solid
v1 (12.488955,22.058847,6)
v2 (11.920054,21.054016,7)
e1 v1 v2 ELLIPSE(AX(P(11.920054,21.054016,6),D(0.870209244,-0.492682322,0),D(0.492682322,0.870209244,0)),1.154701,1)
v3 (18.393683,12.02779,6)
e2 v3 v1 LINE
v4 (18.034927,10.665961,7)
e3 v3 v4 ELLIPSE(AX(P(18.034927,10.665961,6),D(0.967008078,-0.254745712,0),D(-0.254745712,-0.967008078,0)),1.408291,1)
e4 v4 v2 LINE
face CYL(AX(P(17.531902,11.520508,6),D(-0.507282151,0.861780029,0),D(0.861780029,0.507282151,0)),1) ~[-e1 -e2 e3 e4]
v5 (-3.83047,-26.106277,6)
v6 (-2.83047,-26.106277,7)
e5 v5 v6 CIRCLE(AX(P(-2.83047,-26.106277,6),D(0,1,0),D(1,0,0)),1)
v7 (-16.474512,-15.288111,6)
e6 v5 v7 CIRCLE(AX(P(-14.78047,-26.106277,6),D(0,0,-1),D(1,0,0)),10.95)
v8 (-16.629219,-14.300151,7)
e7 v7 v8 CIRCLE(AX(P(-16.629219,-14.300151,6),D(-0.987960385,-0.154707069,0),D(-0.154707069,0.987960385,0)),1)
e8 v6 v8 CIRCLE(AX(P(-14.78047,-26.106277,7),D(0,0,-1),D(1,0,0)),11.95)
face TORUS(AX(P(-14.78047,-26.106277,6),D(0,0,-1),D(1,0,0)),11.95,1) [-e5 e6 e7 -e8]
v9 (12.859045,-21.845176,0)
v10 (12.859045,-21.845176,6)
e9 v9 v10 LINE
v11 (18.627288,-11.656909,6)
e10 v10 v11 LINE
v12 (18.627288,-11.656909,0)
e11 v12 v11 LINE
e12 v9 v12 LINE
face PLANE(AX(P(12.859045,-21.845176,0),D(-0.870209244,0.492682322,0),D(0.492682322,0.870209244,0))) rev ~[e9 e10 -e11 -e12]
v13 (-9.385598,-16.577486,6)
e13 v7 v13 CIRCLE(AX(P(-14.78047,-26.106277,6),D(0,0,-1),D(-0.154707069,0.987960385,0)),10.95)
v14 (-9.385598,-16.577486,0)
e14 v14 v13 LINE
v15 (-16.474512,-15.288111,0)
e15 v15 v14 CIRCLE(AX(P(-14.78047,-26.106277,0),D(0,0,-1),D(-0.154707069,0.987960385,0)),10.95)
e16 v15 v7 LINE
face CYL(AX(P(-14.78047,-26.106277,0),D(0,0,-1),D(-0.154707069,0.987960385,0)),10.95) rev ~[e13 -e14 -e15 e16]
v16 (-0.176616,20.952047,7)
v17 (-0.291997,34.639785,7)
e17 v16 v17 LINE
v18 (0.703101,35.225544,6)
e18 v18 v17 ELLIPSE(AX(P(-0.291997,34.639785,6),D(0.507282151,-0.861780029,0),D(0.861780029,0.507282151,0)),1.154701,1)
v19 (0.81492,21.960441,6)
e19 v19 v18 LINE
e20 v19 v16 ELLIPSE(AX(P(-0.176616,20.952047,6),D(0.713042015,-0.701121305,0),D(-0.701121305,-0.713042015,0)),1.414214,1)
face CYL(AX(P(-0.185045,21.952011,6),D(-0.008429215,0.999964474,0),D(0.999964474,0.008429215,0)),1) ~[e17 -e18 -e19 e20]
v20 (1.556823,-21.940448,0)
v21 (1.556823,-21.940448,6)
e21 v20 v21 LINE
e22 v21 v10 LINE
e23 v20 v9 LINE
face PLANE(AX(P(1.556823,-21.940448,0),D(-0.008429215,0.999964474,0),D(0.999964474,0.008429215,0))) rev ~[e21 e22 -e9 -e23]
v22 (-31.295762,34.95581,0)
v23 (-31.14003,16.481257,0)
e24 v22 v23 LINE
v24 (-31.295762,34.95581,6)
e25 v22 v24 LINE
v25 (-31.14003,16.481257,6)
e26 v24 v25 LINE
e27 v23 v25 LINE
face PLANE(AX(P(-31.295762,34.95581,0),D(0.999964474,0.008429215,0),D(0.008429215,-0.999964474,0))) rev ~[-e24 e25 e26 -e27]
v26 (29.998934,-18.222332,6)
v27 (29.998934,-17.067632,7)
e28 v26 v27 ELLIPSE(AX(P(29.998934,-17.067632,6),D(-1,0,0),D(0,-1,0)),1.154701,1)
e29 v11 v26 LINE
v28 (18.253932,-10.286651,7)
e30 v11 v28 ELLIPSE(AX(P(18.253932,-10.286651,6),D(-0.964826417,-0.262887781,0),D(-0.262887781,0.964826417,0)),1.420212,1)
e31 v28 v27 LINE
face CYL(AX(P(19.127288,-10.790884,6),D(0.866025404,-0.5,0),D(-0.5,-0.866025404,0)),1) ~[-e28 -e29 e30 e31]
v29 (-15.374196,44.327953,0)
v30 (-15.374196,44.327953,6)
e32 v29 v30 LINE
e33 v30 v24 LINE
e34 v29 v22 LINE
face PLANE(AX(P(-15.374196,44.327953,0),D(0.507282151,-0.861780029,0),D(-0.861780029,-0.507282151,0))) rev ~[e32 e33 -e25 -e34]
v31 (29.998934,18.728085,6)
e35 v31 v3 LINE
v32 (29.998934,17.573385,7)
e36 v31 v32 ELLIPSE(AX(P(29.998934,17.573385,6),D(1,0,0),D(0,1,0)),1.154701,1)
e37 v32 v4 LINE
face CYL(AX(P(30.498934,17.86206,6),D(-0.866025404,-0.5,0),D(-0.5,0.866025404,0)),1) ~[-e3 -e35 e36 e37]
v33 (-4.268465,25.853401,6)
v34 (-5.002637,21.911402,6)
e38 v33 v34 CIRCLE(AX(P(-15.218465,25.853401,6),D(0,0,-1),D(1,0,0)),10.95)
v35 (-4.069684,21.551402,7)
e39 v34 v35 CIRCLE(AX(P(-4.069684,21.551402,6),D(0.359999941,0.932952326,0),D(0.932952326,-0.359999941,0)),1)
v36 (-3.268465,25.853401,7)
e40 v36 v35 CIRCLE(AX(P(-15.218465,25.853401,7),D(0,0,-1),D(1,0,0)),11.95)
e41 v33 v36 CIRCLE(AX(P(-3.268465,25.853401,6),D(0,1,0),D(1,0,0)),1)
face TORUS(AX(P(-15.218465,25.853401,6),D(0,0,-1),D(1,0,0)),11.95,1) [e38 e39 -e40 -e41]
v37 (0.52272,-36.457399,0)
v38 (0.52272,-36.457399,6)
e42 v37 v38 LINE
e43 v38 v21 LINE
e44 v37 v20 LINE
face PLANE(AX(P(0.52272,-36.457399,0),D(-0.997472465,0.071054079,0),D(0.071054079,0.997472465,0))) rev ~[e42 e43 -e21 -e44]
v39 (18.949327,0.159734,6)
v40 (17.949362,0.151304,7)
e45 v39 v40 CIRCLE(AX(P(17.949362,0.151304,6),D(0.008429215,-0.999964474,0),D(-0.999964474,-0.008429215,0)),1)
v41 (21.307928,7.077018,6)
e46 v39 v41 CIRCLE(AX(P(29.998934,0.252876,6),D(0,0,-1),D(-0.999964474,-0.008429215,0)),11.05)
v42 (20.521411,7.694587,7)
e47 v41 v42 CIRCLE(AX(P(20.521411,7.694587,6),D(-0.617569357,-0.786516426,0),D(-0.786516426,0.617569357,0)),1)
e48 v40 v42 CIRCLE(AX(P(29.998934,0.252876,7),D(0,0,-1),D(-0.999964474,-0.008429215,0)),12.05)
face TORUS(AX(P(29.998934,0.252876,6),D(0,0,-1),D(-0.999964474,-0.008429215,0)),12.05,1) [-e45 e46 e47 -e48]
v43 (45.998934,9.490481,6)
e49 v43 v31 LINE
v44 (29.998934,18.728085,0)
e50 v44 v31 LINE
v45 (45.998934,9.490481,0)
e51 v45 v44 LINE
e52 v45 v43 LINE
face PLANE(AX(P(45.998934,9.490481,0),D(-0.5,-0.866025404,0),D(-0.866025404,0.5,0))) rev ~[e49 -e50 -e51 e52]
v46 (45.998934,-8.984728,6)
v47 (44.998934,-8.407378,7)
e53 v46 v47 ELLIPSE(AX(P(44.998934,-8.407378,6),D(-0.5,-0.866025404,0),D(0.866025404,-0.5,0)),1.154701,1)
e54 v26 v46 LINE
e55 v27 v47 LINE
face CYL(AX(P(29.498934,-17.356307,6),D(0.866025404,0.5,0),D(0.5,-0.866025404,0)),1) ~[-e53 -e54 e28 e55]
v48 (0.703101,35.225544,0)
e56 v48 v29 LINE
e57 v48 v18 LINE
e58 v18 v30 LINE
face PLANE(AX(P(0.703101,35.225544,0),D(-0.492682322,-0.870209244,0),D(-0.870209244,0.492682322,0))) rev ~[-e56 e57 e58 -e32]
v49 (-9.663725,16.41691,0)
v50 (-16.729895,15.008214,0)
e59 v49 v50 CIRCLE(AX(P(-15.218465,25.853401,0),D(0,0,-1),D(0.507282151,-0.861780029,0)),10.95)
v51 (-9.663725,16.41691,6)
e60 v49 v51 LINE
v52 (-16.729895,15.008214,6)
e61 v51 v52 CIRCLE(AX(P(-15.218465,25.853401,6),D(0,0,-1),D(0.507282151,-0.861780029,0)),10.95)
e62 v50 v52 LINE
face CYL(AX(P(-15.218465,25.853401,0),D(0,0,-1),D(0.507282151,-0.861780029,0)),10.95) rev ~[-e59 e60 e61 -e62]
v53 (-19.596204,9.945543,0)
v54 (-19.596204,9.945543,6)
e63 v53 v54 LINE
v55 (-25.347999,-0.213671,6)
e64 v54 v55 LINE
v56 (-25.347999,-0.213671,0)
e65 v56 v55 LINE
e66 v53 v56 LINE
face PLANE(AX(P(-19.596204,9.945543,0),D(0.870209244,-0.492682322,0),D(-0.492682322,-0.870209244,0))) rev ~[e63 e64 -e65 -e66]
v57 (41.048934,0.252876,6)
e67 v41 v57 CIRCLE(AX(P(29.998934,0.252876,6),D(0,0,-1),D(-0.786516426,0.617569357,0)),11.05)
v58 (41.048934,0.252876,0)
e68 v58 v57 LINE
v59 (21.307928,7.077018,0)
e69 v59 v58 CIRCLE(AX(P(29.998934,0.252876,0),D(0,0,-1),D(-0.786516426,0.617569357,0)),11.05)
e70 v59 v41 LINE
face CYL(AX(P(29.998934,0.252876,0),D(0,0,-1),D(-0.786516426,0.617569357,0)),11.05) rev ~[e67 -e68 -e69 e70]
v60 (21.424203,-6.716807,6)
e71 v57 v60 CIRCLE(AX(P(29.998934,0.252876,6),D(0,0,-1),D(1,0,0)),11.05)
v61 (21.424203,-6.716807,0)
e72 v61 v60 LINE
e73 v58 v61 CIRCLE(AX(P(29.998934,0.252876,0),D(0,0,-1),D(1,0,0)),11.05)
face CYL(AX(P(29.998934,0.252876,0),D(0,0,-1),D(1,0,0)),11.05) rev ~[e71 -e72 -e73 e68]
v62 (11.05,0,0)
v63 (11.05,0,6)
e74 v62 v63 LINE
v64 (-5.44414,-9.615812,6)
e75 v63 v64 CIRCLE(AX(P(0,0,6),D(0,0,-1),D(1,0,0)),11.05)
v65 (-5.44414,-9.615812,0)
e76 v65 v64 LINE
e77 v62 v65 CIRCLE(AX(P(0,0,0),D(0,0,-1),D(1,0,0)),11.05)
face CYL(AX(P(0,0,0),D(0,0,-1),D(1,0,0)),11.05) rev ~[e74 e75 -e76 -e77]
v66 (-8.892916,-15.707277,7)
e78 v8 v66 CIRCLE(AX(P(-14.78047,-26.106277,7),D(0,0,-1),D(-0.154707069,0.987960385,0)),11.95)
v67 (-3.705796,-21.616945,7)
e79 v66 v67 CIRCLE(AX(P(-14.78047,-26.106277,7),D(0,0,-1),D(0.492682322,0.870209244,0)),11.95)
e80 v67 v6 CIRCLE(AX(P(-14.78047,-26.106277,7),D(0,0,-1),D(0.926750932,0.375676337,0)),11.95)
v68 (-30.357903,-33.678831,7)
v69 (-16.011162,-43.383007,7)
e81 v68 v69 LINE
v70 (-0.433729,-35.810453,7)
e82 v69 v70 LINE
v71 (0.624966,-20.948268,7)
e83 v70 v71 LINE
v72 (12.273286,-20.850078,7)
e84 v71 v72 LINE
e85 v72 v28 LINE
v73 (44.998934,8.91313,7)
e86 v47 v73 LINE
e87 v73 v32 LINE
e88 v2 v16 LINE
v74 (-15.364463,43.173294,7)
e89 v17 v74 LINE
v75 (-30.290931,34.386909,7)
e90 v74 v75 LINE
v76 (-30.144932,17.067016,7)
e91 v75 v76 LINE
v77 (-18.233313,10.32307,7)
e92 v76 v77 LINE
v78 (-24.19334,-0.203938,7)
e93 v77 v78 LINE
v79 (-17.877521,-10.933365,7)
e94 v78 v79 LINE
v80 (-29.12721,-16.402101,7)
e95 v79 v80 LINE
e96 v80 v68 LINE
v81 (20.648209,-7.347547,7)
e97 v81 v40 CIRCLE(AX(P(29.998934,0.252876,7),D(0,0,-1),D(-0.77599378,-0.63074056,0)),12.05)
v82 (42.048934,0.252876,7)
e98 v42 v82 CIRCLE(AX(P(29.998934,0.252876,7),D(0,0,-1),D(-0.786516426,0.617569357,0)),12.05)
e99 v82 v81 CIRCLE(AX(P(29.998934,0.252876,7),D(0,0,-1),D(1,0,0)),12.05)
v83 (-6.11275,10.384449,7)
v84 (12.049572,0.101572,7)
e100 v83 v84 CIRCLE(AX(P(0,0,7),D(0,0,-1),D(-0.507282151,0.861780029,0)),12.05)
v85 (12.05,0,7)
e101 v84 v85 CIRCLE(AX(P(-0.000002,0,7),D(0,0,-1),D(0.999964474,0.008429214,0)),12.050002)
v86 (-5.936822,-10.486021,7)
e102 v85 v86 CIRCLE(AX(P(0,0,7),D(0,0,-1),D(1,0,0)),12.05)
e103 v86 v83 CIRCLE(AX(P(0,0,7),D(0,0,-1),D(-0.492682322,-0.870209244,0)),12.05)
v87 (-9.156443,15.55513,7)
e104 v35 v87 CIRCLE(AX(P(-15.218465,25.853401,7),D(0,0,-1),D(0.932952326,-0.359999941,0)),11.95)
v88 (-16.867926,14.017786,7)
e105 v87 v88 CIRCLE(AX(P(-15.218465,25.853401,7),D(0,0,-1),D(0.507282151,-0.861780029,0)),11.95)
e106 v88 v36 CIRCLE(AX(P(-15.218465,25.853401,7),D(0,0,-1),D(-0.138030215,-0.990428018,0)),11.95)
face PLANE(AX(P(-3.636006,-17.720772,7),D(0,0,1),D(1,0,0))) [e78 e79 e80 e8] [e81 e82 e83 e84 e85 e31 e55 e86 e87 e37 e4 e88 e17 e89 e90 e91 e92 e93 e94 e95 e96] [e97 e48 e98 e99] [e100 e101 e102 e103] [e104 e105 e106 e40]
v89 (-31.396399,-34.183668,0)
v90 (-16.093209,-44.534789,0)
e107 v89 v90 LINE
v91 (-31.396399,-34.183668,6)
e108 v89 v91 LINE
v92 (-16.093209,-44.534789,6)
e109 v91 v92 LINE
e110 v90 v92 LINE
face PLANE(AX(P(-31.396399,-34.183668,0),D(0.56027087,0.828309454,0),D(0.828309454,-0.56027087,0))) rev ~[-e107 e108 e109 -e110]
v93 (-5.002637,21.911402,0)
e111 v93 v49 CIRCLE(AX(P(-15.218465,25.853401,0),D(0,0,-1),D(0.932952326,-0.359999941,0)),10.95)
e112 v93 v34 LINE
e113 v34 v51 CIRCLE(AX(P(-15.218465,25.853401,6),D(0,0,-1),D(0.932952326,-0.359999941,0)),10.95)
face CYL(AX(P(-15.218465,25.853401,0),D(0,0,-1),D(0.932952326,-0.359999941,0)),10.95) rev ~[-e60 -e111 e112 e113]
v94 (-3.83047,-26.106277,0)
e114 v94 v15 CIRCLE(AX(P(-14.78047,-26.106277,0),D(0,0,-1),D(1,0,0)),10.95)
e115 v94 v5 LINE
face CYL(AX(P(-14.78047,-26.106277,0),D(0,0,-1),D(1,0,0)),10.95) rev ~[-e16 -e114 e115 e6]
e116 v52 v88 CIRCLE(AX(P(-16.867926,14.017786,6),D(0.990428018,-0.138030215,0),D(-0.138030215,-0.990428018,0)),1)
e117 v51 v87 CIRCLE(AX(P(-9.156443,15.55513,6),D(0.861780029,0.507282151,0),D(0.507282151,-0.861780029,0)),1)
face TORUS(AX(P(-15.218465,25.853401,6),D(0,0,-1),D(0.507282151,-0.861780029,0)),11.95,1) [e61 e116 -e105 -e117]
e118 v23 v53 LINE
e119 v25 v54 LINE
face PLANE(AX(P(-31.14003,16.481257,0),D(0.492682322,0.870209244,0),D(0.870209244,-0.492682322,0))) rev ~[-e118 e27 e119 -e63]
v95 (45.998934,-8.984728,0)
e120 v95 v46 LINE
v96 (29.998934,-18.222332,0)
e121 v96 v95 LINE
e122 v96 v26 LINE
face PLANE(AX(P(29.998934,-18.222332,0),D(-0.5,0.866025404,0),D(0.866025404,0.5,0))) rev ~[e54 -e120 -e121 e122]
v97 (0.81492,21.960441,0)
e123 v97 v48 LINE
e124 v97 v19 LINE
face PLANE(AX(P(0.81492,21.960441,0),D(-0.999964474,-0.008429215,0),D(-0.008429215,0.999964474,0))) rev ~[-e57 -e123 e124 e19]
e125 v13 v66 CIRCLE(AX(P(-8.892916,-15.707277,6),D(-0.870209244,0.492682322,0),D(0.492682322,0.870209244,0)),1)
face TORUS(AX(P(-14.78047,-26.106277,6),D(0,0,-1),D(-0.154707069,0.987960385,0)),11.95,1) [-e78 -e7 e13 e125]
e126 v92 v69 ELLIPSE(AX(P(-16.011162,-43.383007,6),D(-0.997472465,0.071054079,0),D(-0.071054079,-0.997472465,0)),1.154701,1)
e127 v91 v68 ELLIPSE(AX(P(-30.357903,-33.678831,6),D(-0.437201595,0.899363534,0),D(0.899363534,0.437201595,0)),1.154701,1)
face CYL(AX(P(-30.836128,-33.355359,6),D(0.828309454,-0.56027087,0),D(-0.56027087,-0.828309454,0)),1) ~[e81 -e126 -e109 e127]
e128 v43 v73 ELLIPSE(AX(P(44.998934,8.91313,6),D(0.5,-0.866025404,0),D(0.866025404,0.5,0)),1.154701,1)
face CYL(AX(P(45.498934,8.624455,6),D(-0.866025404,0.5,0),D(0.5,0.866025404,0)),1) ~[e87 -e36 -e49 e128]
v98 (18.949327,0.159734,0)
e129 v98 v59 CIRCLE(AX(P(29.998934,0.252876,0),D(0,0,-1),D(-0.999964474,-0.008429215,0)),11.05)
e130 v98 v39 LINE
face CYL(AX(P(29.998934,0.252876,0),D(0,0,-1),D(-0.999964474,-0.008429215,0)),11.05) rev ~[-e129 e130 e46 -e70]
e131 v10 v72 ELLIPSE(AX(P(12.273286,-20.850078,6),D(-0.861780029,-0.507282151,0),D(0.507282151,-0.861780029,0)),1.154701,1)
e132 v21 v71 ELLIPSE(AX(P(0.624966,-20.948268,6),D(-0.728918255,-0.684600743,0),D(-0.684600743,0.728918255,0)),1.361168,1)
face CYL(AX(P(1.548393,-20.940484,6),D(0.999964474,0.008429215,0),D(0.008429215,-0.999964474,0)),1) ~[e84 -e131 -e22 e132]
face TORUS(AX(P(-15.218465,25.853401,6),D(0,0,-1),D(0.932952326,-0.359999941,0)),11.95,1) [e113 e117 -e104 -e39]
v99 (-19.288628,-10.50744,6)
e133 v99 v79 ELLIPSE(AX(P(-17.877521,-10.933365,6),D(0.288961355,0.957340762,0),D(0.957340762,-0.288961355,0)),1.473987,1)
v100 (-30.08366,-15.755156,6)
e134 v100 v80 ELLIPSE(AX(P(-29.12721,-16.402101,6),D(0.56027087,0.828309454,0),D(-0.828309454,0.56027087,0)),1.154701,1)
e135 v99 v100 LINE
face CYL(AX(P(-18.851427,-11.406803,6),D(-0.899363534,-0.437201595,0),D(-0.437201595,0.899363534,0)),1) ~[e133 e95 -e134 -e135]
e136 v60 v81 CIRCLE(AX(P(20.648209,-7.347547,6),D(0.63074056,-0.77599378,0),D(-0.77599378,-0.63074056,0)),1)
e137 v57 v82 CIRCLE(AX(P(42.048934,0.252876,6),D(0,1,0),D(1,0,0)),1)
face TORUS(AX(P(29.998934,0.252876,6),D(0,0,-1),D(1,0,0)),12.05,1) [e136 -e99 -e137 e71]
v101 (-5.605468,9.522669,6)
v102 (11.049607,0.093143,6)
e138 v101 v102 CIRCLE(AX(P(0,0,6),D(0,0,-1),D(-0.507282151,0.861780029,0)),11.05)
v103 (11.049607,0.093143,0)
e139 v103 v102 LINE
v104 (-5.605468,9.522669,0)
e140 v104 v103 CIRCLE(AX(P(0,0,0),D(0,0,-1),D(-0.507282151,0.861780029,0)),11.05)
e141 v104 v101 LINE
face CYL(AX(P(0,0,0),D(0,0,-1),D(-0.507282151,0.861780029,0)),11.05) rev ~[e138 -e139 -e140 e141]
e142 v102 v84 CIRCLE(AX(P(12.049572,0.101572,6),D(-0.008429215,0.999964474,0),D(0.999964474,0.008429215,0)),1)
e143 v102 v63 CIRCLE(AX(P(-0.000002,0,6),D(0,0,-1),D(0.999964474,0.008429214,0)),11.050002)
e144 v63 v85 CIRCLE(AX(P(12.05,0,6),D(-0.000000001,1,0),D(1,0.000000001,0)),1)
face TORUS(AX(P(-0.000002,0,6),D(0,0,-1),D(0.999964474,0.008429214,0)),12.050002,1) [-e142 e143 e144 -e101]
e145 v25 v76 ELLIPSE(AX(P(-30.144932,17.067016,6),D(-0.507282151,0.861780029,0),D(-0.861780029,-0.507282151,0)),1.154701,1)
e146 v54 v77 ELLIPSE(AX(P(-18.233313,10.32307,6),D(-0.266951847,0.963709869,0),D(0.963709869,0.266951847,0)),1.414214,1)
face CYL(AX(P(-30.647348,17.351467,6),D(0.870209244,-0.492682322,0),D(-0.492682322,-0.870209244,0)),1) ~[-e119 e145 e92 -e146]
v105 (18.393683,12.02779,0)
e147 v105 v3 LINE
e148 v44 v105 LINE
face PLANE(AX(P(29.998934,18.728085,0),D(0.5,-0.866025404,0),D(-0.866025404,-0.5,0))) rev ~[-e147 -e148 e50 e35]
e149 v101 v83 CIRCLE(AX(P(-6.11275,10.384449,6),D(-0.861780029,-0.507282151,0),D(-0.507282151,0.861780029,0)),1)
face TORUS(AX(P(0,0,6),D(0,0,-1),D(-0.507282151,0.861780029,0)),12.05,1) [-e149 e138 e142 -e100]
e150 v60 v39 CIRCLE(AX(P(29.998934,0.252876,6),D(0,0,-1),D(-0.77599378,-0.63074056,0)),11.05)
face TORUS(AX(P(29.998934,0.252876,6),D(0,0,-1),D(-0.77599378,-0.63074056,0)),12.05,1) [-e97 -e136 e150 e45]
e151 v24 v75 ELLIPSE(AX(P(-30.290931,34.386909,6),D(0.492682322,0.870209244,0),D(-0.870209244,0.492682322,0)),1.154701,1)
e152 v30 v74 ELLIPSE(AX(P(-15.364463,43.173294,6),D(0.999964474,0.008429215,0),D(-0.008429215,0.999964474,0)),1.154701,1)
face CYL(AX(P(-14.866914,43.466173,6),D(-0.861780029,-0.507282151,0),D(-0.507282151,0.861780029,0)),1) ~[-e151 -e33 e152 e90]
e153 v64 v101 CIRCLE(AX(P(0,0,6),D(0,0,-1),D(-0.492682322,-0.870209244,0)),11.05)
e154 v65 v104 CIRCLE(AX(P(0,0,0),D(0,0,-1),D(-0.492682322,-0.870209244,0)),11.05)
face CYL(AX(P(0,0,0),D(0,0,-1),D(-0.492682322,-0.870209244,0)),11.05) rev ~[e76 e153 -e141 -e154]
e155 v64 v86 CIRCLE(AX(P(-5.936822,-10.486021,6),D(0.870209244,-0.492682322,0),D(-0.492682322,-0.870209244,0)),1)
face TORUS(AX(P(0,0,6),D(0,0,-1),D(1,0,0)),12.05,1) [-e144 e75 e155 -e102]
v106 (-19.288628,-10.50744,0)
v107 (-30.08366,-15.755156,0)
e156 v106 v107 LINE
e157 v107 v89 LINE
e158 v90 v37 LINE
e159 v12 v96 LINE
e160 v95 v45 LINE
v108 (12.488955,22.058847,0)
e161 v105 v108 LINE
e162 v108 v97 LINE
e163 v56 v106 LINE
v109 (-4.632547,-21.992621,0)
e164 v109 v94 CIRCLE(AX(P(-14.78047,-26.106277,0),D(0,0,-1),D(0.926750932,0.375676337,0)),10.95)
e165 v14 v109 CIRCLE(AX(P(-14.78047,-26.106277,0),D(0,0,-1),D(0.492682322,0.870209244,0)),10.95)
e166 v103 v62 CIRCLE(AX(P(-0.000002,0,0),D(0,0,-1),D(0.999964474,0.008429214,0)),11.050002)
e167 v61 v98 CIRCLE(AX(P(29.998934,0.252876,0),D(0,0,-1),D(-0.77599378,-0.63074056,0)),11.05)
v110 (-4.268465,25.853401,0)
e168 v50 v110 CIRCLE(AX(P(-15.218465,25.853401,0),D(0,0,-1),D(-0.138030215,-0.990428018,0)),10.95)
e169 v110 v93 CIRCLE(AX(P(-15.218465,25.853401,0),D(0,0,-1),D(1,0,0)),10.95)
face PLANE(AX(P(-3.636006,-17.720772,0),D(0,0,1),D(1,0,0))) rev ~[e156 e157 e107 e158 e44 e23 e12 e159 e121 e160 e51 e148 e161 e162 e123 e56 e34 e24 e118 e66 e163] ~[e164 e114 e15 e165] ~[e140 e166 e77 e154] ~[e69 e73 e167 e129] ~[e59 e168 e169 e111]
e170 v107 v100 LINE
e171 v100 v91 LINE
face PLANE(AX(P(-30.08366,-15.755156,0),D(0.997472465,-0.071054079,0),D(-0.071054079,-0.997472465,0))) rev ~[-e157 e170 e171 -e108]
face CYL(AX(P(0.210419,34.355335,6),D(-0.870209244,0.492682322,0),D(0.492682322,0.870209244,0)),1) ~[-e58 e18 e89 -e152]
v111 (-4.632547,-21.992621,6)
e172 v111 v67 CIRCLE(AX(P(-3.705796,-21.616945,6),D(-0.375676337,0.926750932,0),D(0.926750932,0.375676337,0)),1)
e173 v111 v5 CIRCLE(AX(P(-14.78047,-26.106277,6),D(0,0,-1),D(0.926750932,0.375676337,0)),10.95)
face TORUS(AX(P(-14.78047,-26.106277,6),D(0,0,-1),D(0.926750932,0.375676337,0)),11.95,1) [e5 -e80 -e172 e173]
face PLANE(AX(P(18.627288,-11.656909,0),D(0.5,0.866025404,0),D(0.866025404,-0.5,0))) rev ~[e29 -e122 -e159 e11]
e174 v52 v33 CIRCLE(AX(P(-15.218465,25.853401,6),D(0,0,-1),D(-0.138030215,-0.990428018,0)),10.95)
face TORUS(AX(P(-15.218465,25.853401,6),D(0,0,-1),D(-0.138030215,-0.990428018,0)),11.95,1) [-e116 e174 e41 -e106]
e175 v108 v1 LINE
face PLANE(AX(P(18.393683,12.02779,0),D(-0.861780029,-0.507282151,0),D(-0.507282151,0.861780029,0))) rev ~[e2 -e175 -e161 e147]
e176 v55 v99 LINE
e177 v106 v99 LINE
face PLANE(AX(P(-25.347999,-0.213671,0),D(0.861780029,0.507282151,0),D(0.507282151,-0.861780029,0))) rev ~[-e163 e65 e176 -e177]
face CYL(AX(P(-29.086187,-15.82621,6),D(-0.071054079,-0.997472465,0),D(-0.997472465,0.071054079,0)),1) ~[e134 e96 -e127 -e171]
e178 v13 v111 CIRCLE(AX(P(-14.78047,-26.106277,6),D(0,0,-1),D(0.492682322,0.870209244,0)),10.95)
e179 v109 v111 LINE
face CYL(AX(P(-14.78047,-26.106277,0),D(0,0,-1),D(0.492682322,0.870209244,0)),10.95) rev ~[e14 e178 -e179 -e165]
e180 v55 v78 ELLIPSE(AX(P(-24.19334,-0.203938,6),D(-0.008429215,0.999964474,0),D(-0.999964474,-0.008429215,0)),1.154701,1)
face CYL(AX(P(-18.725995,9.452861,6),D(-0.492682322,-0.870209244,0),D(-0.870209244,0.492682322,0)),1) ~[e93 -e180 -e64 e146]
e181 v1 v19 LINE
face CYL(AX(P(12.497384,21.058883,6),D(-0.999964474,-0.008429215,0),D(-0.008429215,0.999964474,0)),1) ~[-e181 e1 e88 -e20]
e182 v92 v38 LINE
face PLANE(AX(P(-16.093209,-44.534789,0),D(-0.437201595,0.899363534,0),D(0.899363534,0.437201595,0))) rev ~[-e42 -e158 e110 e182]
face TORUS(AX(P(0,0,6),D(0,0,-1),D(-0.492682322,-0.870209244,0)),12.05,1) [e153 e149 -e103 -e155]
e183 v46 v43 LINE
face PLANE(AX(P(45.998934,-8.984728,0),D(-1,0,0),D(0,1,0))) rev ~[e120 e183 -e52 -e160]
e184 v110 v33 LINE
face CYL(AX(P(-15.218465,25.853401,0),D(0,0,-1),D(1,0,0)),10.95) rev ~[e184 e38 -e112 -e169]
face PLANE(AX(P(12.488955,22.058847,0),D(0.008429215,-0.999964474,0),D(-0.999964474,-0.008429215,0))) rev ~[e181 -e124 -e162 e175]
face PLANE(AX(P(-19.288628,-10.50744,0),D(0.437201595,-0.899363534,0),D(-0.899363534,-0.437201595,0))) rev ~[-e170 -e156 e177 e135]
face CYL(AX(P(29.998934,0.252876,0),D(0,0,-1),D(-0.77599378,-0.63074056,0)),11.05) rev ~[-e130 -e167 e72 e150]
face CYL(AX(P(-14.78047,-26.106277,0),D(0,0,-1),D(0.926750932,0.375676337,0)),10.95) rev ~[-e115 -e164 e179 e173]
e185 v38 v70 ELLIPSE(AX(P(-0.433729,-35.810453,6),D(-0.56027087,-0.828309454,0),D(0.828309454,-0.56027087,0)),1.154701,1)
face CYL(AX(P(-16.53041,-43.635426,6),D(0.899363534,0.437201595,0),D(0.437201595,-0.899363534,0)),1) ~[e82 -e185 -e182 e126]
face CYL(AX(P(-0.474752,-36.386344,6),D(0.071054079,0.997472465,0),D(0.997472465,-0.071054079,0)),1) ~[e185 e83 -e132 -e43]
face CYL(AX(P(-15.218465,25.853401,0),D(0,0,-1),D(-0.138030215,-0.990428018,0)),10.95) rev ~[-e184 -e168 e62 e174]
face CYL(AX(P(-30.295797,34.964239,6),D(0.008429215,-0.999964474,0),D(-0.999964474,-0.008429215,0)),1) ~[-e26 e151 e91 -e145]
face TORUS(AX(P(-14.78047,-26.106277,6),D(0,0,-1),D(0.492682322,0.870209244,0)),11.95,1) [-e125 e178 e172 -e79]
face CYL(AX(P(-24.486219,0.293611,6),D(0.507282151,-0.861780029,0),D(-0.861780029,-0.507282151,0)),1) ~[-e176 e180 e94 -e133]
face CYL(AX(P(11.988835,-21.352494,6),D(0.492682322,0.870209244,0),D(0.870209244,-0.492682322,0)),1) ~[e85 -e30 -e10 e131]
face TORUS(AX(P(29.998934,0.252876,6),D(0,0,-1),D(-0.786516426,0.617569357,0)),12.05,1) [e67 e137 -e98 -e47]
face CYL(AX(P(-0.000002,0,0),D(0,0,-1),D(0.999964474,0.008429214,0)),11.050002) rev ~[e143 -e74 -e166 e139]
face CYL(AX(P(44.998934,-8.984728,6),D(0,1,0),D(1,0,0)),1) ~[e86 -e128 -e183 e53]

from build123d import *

# Parameters (mm, degrees)
F1_DEPTH = 7
F2_R     = 1


# Not quite as in the source:
# - a feature names something its author has since deleted; it is built from what else it names


with BuildPart() as f1:
    # F0 (on Top) → F1 (new body)
    with BuildSketch(Plane.XY):
        with BuildLine():
            Line((1.8354592313, -18.0288866684), (-6.8725484416, -12.1387655175))
            Line((-6.8725484416, -12.1387655175), (-9.3855982427, -16.577486107))
            ThreePointArc((-9.3855982427, -16.577486107), (-6.5509171288, -18.8829148956), (-4.6325469674, -21.9926214477))
            Line((-4.6325469674, -21.9926214477), (1.5568225731, -21.9404480676))
            Line((1.5568225731, -21.9404480676), (1.8354592313, -18.0288866684))
        make_face()
        with BuildLine():
            Line((-9.3855982427, -16.577486107), (-6.8725484416, -12.1387655175))
            Line((-6.8725484416, -12.1387655175), (-13.4677307337, -7.677765462))
            Line((-13.4677307337, -7.677765462), (-19.2886284671, -10.507439643))
            Line((-19.2886284671, -10.507439643), (-16.4745120744, -15.2881111147))
            ThreePointArc((-16.4745120744, -15.2881111147), (-12.8209656942, -15.3330306479), (-9.3855982427, -16.577486107))
        make_face()
        with BuildLine():
            Line((-16.4745120744, -15.2881111147), (-19.2886284671, -10.507439643))
            Line((-19.2886284671, -10.507439643), (-30.0836596385, -15.7551561274))
            Line((-30.0836596385, -15.7551561274), (-31.3963985784, -34.1836679993))
            Line((-31.3963985784, -34.1836679993), (-16.0932086134, -44.5347892056))
            Line((-16.0932086134, -44.5347892056), (0.5227202914, -36.4573985402))
            Line((0.5227202914, -36.4573985402), (1.5568225731, -21.9404480676))
            Line((1.5568225731, -21.9404480676), (-4.6325469674, -21.9926214477))
            ThreePointArc((-4.6325469674, -21.9926214477), (-4.0328593896, -24.010716983), (-3.8304696735, -26.1062773338))
            ThreePointArc((-3.8304696735, -26.1062773338), (-21.8992032586, -34.4265016183), (-16.4745120744, -15.2881111147))
        make_face()
        with BuildLine():
            Line((13.9989342061, 9.4904807568), (13.9989342061, 0.1180042183))
            Line((13.9989342061, 0.1180042183), (18.9493267735, 0.1597336241))
            ThreePointArc((18.9493267735, 0.1597336241), (19.5401979067, 3.8190137185), (21.3079276944, 7.0770178473))
            Line((21.3079276944, 7.0770178473), (18.3936825257, 12.0277898821))
            Line((18.3936825257, 12.0277898821), (13.9989342061, 9.4904807568))
        make_face()
        with BuildLine():
            Line((18.9493267735, 0.1597336241), (13.9989342061, 0.1180042183))
            Line((13.9989342061, 0.1180042183), (13.9989342061, -8.9847278573))
            Line((13.9989342061, -8.9847278573), (18.627288083, -11.656909214))
            Line((18.627288083, -11.656909214), (21.4242029382, -6.7168067341))
            ThreePointArc((21.4242029382, -6.7168067341), (19.6018014676, -3.4890656687), (18.9493267735, 0.1597336241))
        make_face()
        with BuildLine():
            Line((21.4242029382, -6.7168067341), (18.627288083, -11.656909214))
            Line((18.627288083, -11.656909214), (29.9989342061, -18.2223321643))
            Line((29.9989342061, -18.2223321643), (45.9989342061, -8.9847278573))
            Line((45.9989342061, -8.9847278573), (45.9989342061, 9.4904807568))
            Line((45.9989342061, 9.4904807568), (29.9989342061, 18.7280850638))
            Line((29.9989342061, 18.7280850638), (18.3936825257, 12.0277898821))
            Line((18.3936825257, 12.0277898821), (21.3079276944, 7.0770178473))
            ThreePointArc((21.3079276944, 7.0770178473), (33.6091196616, 10.6964898559), (41.0489342061, 0.2528764497))
            ThreePointArc((41.0489342061, 0.2528764497), (33.6970228671, -10.1599349024), (21.4242029382, -6.7168067341))
        make_face()
        with BuildLine():
            Line((-15.0627330271, 7.3788486288), (-7.1019501152, 12.0649204126))
            Line((-7.1019501152, 12.0649204126), (-9.6637249782, 16.4169095614))
            ThreePointArc((-9.6637249782, 16.4169095614), (-13.0776254326, 15.1147180995), (-16.7298953858, 15.0082140818))
            Line((-16.7298953858, 15.0082140818), (-19.5962043346, 9.9455430035))
            Line((-19.5962043346, 9.9455430035), (-15.0627330271, 7.3788486288))
        make_face()
        with BuildLine():
            Line((-9.6637249782, 16.4169095614), (-7.1019501152, 12.0649204126))
            Line((-7.1019501152, 12.0649204126), (0.8588327967, 16.7509921963))
            Line((0.8588327967, 16.7509921963), (0.8149196752, 21.9604407032))
            Line((0.8149196752, 21.9604407032), (-5.002636564, 21.9114015287))
            ThreePointArc((-5.002636564, 21.9114015287), (-6.868311211, 18.7697973162), (-9.6637249782, 16.4169095614))
        make_face()
        with BuildLine():
            Line((-5.002636564, 21.9114015287), (0.8149196752, 21.9604407032))
            Line((0.8149196752, 21.9604407032), (0.7031012913, 35.2255444515))
            Line((0.7031012913, 35.2255444515), (-15.374196038, 44.3279531393))
            Line((-15.374196038, 44.3279531393), (-31.2957618618, 34.9558095718))
            Line((-31.2957618618, 34.9558095718), (-31.1400303564, 16.4812573166))
            Line((-31.1400303564, 16.4812573166), (-19.5962043346, 9.9455430035))
            Line((-19.5962043346, 9.9455430035), (-16.7298953858, 15.0082140818))
            ThreePointArc((-16.7298953858, 15.0082140818), (-22.4070781735, 34.1133242446), (-4.2684645325, 25.8534008841))
            ThreePointArc((-4.2684645325, 25.8534008841), (-4.4535721444, 23.8485088989), (-5.002636564, 21.9114015287))
        make_face()
        with BuildLine():
            ThreePointArc((-5.6054677695, 9.5226693256), (5.4441396631, 9.6158121513), (11.0496074326, 0.0931428257))
            Line((11.0496074326, 0.0931428257), (13.9989342061, 0.1180042183))
            Line((13.9989342061, 0.1180042183), (13.9989342061, 9.4904807568))
            Line((13.9989342061, 9.4904807568), (18.3936825257, 12.0277898821))
            Line((18.3936825257, 12.0277898821), (12.4889549437, 22.0588471523))
            Line((12.4889549437, 22.0588471523), (0.8149196752, 21.9604407032))
            Line((0.8149196752, 21.9604407032), (0.8588327967, 16.7509921963))
            Line((0.8588327967, 16.7509921963), (-7.1019501152, 12.0649204126))
            Line((-7.1019501152, 12.0649204126), (-5.6054677695, 9.5226693256))
        make_face()
        with BuildLine():
            Line((-6.8725484416, -12.1387655175), (-5.4441396631, -9.6158121513))
            ThreePointArc((-5.4441396631, -9.6158121513), (-11.0496074326, -0.0931428257), (-5.6054677695, 9.5226693256))
            Line((-5.6054677695, 9.5226693256), (-7.1019501152, 12.0649204126))
            Line((-7.1019501152, 12.0649204126), (-15.0627330271, 7.3788486288))
            Line((-15.0627330271, 7.3788486288), (-19.5962043346, 9.9455430035))
            Line((-19.5962043346, 9.9455430035), (-25.3479994839, -0.2136713282))
            Line((-25.3479994839, -0.2136713282), (-19.2886284671, -10.507439643))
            Line((-19.2886284671, -10.507439643), (-13.4677307337, -7.677765462))
            Line((-13.4677307337, -7.677765462), (-6.8725484416, -12.1387655175))
        make_face()
        with BuildLine():
            ThreePointArc((11.0496074326, 0.0931428257), (11.0499018577, 0.0465718265), (11.05, 0))
            ThreePointArc((11.05, 0), (5.5652833137, -9.5462098049), (-5.4441396631, -9.6158121513))
            Line((-5.4441396631, -9.6158121513), (-6.8725484416, -12.1387655175))
            Line((-6.8725484416, -12.1387655175), (1.8354592313, -18.0288866684))
            Line((1.8354592313, -18.0288866684), (1.5568225731, -21.9404480676))
            Line((1.5568225731, -21.9404480676), (12.8590445403, -21.8451758241))
            Line((12.8590445403, -21.8451758241), (18.627288083, -11.656909214))
            Line((18.627288083, -11.656909214), (13.9989342061, -8.9847278573))
            Line((13.9989342061, -8.9847278573), (13.9989342061, 0.1180042183))
            Line((13.9989342061, 0.1180042183), (11.0496074326, 0.0931428257))
        make_face()
    extrude(amount=F1_DEPTH)

    # F2
    f2_edges = [f1.edges().sort_by_distance(p)[0] for p in [
        (-23.744804, -39.359229, 7),
        (-7.785244, -40.496094, 7),
        (1.039771, -29.198923, 7),
        (7.207934, -21.892812, 7),
        (15.743166, -16.751043, 7),
        (24.313111, -14.939621, 7),
        (37.998934, -13.60353, 7),
        (45.998934, 0.252876, 7),
        (37.998934, 14.109283, 7),
        (24.196308, 15.377937, 7),
        (15.441319, 17.043319, 7),
        (6.651937, 22.009644, 7),
        (0.75901, 28.592993, 7),
        (-7.335547, 39.776749, 7),
        (-23.334979, 39.641881, 7),
        (-31.217896, 25.718533, 7),
        (-25.368117, 13.2134, 7),
        (-22.472102, 4.865936, 7),
        (-22.318314, -5.360555, 7),
        (-24.686144, -13.131298, 7),
        (-30.740029, -24.969412, 7),
        (-13.086427, -36.924444, 7),
        (38.689941, -6.571265, 7),
        (-13.707034, 36.698588, 7),
        (-11.049607, -0.093143, 7),
    ]]
    fillet(f2_edges, radius=F2_R)


solid = f1.part
